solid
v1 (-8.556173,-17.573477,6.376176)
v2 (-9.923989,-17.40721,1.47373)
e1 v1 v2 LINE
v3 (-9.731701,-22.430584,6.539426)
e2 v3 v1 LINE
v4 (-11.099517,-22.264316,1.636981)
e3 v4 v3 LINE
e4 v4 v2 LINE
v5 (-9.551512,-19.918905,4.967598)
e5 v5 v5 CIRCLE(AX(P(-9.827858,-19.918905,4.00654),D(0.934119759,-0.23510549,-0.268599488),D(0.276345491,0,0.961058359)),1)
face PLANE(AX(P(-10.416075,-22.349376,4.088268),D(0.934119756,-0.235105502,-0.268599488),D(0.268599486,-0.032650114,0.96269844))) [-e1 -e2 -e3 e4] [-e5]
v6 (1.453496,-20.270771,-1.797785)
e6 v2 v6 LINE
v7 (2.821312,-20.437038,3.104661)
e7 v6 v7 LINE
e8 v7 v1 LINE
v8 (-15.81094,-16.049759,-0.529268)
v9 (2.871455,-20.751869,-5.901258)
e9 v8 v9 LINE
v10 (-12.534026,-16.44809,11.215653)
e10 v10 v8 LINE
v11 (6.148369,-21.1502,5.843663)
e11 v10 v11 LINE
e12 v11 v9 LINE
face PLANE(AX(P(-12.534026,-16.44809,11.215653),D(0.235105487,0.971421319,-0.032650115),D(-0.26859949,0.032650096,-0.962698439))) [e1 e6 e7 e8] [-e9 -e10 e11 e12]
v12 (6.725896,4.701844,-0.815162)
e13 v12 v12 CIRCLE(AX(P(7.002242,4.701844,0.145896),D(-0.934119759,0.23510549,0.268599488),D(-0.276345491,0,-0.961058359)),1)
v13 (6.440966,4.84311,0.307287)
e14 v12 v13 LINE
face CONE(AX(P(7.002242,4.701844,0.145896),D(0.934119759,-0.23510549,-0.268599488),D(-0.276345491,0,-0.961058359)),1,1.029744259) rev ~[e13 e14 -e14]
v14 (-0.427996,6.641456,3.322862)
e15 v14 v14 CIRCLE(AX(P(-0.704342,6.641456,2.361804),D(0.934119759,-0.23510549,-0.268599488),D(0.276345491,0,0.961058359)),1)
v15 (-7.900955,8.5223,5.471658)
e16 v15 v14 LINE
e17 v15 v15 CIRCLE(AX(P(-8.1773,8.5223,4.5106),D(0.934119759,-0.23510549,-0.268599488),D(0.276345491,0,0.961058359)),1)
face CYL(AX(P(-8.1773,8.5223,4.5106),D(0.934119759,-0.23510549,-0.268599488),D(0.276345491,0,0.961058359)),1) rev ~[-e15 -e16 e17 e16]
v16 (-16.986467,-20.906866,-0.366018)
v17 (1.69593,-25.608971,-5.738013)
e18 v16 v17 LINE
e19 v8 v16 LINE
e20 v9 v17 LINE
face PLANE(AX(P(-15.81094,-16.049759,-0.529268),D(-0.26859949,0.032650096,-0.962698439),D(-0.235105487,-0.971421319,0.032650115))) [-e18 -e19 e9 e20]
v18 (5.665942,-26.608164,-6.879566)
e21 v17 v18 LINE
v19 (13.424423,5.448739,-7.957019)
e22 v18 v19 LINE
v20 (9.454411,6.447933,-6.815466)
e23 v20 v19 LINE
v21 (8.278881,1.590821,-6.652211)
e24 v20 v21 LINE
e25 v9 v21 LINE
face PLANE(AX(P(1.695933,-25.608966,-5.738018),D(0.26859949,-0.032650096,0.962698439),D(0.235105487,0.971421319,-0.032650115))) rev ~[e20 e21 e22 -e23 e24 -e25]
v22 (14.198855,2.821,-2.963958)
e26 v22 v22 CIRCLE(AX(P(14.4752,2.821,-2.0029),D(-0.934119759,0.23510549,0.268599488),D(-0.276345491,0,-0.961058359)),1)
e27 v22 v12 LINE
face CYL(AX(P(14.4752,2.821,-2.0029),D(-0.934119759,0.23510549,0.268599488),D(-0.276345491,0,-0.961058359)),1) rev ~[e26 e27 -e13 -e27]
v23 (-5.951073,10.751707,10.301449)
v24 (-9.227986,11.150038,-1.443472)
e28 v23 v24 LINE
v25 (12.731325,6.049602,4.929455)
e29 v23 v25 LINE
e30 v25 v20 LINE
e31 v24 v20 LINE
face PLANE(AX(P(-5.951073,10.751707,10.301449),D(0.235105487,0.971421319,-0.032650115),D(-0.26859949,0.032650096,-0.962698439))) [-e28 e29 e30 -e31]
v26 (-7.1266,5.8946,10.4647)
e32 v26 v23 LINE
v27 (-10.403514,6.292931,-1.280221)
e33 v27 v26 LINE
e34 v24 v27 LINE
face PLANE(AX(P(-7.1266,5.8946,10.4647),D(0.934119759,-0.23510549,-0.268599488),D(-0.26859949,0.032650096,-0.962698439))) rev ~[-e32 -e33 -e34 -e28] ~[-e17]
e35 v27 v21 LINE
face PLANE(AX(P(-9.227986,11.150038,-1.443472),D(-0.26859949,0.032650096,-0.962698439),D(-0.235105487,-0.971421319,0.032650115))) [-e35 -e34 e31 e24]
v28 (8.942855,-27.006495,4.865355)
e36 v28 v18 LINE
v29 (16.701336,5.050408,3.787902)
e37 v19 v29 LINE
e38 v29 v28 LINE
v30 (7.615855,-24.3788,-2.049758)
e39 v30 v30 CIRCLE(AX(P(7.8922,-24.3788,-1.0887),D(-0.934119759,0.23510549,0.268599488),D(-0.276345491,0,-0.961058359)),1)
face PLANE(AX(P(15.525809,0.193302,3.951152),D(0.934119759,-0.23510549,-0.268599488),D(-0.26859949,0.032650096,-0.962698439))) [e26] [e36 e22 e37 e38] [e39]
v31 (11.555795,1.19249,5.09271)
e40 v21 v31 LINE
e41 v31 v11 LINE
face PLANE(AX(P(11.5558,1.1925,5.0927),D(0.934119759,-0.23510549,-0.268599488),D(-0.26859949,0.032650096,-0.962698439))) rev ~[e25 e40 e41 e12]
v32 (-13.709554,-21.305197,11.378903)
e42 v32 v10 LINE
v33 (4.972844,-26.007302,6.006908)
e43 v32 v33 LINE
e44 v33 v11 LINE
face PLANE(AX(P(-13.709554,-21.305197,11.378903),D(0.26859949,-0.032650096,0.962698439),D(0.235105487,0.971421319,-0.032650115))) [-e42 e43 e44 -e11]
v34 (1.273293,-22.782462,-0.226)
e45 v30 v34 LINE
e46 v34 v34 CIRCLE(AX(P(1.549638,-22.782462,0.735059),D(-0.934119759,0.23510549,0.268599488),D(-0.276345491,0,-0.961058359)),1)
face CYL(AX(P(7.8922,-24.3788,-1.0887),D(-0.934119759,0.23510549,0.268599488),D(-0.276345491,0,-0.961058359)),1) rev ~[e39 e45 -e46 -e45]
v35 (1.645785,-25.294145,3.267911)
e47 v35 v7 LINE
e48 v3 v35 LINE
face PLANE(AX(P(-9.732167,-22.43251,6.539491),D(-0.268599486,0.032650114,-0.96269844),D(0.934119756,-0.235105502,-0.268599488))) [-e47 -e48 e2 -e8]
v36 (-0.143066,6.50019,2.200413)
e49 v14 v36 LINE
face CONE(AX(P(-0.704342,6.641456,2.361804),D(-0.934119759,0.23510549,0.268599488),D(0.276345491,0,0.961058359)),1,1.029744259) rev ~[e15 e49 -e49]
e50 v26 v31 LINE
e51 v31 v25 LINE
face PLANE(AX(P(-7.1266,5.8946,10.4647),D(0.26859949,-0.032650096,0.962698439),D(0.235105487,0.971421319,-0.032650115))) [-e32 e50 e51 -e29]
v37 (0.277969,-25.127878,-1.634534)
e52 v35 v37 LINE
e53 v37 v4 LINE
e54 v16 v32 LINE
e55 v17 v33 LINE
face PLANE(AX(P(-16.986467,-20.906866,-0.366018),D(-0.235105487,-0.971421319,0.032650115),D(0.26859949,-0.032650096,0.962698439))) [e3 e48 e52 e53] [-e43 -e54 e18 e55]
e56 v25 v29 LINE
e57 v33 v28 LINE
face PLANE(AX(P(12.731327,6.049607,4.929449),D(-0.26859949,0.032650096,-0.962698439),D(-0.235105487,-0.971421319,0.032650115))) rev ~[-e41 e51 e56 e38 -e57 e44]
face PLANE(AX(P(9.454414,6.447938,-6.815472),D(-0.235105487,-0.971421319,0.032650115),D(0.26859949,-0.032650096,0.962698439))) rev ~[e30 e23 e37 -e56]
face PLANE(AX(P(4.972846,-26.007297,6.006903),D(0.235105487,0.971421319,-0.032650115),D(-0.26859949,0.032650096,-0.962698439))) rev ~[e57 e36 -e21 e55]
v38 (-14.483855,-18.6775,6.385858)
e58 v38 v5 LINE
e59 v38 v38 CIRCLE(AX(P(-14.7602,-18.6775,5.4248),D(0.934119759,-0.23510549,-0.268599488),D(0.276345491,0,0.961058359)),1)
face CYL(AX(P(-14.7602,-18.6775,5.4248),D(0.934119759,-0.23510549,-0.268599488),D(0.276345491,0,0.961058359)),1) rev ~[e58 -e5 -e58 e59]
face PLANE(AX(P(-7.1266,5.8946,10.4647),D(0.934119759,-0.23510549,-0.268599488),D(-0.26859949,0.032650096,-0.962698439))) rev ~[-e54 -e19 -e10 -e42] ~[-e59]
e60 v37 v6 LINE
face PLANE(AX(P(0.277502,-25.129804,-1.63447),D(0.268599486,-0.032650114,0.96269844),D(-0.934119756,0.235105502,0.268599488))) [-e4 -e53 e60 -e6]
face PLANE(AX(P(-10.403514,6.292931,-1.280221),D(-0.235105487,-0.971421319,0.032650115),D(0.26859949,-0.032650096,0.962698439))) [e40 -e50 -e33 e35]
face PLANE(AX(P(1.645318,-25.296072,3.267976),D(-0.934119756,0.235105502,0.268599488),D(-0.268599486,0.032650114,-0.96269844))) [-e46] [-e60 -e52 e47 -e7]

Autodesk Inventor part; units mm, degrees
ref_plane "YZ Plane" through (0, 0, 0) normal (1, 0, 0) x (0, 1, 0)
ref_plane "Work Plane10" through (-7.1266, 5.8946, 10.4647) normal (0.9341198, -0.2351055, -0.2685995) x (-0.2685995, 0.0326501, -0.9626984)
sketch "Sketch2" plane through (-7.1266, 5.8946, 10.4647) normal (0.9341198, -0.2351055, -0.2685995) x (-0.2685995, 0.0326501, -0.9626984)
  line L0 (0, 5) -> (12.2, 5)
  line L1 (12.2, 5) -> (12.2, 0)
  line L2 (12.2, 0) -> (0, 0)
  line L3 (0, 0) -> (0, 5)
  line L4 (12.2, -28) -> (0, -28)
  line L5 (0, -28) -> (0, -23)
  line L6 (0, -23) -> (12.2, -23)
  line L7 (12.2, -23) -> (12.2, -28)
  point P0 (7.9677, -3.709)
extrude "Extrusion2" add sketch "Sketch2" along normal blind 20
ref_plane "Work Plane12" through (-19.3217, -20.3191, 0.3055) normal (-0.2351055, -0.9714213, 0.0326501) x (0.9341198, -0.2351055, -0.2685995)
sketch "Sketch4" plane through (-19.3217, -20.3191, 0.3055) normal (-0.2351055, -0.9714213, 0.0326501) x (0.9341198, -0.2351055, -0.2685995)
  line L0 (7.7802, 8.6462) -> (19.9601, 8.6462)
  line L1 (19.9601, 8.6462) -> (19.9601, 3.5538)
  line L2 (19.9601, 3.5538) -> (7.7802, 3.5538)
  line L3 (7.7802, 3.5538) -> (7.7802, 8.6462)
  line L4 (43.7973, 6.1) -> (-30.4435, 6.1) projected
  point P0 (13.3537, 4.2323)
  point P1 (7.7802, 6.1)
extrude "Extrusion4" cut sketch "Sketch4" against normal up to surface (5 mm away)
ref_plane "Work Plane11" through (11.5558, 1.1925, 5.0927) normal (0.9341198, -0.2351055, -0.2685995) x (-0.2685995, 0.0326501, -0.9626984)
sketch "Sketch5" plane through (11.5558, 1.1925, 5.0927) normal (0.9341198, -0.2351055, -0.2685995) x (-0.2685995, 0.0326501, -0.9626984)
  line L0 (12.2, 5) -> (0, 5)
  line L1 (0, 5) -> (0, -28)
  line L2 (0, -28) -> (12.2, -28)
  line L3 (12.2, -28) -> (12.2, 5)
  point P0 (7.9677, -3.709)
extrude "Extrusion5" add sketch "Sketch5" along normal blind 4.25
hole "Hole1" at (-14.7602, -18.6775, 5.4248) direction (0.9341198, -0.2351055, -0.2685995) diameter 2 depth 8 tip angle 118
hole "Hole3" at (-8.1773, 8.5223, 4.5106) direction (0.9341198, -0.2351055, -0.2685995) diameter 2 depth 8 tip angle 118
thread "Thread1" size "M2x0.4" class "6H" standard "ANSI Metric M Profile" full length
thread "Thread2" size "M2x0.4" class "6H" standard "ANSI Metric M Profile" full length
hole "Hole4" at (7.8922, -24.3788, -1.0887) direction (-0.9341198, 0.2351055, 0.2685995) diameter 2 depth 8 tip angle 118
hole "Hole5" at (14.4752, 2.821, -2.0029) direction (-0.9341198, 0.2351055, 0.2685995) diameter 2 depth 8 tip angle 118
thread "Thread3" size "M2x0.4" class "6H" standard "ANSI Metric M Profile" full length
properties part number "servo_attachement"
